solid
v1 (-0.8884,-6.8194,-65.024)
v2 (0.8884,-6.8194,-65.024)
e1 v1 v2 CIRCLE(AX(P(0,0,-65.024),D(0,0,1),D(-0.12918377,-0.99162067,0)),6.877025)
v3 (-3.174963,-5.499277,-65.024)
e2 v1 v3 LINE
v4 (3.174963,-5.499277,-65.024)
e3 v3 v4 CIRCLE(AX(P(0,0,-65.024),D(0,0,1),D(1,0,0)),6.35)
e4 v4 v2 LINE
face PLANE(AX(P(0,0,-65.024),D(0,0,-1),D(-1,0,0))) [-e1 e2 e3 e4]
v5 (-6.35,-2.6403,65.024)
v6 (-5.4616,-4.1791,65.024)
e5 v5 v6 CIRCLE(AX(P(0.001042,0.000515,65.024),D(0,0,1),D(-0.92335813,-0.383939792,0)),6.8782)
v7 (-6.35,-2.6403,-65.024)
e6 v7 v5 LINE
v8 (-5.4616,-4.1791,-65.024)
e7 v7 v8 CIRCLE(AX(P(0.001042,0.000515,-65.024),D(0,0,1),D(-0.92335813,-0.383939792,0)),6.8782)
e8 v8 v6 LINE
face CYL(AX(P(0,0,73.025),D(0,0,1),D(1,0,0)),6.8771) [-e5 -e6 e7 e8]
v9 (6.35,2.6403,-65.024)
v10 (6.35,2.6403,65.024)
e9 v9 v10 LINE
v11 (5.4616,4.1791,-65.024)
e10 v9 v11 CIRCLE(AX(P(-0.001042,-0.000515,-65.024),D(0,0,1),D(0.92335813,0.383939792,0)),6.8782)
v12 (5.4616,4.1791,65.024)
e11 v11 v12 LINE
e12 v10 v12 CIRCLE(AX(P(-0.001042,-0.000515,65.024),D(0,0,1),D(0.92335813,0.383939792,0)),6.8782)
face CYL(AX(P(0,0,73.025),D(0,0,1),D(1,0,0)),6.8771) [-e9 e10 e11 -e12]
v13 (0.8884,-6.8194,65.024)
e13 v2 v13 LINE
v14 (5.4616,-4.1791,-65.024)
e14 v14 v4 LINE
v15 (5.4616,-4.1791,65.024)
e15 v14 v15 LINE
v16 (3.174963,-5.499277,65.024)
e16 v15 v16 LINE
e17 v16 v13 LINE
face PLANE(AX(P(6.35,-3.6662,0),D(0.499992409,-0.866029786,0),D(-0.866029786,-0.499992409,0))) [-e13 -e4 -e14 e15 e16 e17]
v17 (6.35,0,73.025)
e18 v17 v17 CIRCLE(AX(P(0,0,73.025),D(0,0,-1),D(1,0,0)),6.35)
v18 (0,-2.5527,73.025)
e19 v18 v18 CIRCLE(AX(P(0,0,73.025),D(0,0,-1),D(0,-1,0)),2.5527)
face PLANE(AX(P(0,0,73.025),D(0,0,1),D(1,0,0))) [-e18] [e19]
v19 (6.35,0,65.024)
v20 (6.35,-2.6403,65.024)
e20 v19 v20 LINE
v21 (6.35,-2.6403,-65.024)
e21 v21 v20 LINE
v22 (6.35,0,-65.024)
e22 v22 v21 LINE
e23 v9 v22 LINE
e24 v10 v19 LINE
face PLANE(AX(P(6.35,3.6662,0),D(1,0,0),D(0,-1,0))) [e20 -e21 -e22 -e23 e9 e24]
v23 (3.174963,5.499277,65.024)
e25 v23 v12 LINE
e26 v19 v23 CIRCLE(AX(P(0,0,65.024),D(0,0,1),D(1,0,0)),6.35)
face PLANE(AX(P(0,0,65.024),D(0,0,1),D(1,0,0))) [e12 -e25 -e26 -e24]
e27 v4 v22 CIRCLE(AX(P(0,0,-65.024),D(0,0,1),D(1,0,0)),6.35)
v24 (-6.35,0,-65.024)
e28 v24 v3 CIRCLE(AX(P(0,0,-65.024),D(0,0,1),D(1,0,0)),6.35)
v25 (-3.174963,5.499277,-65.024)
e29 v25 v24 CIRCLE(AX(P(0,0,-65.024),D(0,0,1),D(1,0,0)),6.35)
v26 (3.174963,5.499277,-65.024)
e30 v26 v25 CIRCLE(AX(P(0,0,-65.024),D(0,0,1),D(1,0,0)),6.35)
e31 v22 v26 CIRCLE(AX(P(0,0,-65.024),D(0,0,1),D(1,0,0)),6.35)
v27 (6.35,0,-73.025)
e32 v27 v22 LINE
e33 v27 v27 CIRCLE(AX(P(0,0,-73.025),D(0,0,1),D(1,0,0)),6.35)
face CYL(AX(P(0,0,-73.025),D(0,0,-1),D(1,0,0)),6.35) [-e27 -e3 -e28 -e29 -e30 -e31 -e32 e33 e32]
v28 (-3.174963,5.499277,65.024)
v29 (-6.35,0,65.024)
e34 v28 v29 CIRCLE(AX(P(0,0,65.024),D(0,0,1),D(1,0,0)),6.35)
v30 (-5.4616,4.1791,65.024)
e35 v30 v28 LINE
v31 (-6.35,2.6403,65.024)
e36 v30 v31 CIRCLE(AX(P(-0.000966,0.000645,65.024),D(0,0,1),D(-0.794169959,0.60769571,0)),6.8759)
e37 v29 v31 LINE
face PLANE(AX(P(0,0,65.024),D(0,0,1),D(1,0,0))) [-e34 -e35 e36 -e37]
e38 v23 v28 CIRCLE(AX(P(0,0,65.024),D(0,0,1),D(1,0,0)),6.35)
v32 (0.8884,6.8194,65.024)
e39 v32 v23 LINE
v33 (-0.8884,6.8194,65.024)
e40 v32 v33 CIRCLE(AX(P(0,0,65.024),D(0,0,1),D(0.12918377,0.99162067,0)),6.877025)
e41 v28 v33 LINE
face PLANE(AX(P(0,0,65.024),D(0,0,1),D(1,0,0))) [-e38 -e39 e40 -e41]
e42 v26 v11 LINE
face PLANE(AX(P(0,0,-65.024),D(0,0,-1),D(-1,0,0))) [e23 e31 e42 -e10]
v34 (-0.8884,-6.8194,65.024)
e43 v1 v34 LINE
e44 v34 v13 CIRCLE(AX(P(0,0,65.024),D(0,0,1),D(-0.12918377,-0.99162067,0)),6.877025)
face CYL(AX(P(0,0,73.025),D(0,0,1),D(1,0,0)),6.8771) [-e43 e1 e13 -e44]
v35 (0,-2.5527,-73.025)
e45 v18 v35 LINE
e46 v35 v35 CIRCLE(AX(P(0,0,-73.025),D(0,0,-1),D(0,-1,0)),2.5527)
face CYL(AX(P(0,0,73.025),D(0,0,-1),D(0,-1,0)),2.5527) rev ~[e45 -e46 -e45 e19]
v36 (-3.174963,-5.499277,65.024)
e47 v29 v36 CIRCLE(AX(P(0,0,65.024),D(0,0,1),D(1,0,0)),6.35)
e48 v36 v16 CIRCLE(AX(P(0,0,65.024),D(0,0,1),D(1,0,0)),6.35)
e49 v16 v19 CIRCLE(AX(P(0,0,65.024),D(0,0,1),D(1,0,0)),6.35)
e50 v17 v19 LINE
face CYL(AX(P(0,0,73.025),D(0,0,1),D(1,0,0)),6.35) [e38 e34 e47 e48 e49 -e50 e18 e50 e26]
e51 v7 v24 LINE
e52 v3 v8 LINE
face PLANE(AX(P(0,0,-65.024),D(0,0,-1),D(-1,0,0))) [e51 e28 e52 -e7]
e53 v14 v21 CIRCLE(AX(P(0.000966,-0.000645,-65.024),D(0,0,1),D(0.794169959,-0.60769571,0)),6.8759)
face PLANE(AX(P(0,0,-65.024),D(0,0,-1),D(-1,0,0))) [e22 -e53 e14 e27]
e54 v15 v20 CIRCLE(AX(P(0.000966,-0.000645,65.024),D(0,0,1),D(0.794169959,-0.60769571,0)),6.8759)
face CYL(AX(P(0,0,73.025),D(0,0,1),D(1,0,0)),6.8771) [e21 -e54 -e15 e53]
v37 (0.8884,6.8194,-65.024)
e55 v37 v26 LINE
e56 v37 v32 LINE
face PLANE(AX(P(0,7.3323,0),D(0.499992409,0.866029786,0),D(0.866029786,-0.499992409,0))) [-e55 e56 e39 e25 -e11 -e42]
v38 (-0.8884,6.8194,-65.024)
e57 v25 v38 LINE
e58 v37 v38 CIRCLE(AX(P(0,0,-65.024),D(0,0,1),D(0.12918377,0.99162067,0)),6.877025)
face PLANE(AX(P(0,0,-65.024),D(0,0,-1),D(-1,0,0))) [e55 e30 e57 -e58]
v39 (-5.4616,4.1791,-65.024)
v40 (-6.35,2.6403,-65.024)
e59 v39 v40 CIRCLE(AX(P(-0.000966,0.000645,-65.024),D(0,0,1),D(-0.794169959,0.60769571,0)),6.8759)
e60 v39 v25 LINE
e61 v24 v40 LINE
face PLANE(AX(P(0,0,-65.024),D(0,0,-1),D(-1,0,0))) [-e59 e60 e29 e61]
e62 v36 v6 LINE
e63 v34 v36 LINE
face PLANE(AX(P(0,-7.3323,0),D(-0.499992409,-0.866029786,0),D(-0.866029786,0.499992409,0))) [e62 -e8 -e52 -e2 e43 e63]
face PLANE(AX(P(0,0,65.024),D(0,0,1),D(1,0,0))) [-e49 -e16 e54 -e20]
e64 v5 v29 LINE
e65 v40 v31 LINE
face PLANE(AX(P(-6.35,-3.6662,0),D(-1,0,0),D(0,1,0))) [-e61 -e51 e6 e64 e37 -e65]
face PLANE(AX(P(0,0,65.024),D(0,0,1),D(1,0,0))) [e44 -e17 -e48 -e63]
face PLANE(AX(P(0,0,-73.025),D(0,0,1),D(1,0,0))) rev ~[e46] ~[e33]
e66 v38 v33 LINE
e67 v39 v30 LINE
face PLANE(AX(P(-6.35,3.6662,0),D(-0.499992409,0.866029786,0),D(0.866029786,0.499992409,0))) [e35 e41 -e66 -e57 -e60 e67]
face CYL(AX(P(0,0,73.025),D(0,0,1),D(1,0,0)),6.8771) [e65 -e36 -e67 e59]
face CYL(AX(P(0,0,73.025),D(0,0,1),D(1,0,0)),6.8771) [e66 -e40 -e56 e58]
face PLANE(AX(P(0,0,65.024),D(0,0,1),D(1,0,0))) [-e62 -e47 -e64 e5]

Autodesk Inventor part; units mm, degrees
ref_plane "YZ Plane" through (0, 0, 0) normal (1, 0, 0) x (0, 1, 0)
ref_plane "XZ Plane" through (0, 0, 0) normal (0, 1, 0) x (-1, 0, 0)
ref_plane "XY Plane" through (0, 0, 0) normal (0, 0, 1) x (1, 0, 0)
sketch "Sketch1" plane through (0, 0, 0) normal (0, 0, 1) x (1, 0, 0)
  line L0 (-6.35, -3.6662) -> (-6.35, 3.6662)
  line L1 (-6.35, 3.6662) -> (0, 7.3323)
  line L2 (0, 7.3323) -> (6.35, 3.6662)
  line L3 (6.35, 3.6662) -> (6.35, -3.6662)
  line L4 (6.35, -3.6662) -> (0, -7.3323)
  line L5 (0, -7.3323) -> (-6.35, -3.6662)
  point P0 (0, 0)
  point P1 (0, 0)
  dimension "Size" = 12.7
extrude "Extrusion1" add sketch "Sketch1" along normal mid plane 146.05
sketch "Sketch3" plane through (0, 0, 73.025) normal (0, 0, 1) x (1, 0, 0)
  line L0 (-6.35, 3.6662) -> (0, 7.3323) construction
  line L1 (0, 7.3323) -> (6.35, 3.6662) construction
  line L2 (6.35, 3.6662) -> (6.35, -3.6662) construction
  line L3 (6.35, -3.6662) -> (0, -7.3323) construction
  line L4 (0, -7.3323) -> (-6.35, -3.6662) construction
  line L5 (-6.35, -3.6662) -> (-6.35, 3.6662) construction
  point P0 (0, 0)
hole "Hole1" at (0, 0, 73.025) direction (0, 0, -1) diameter 5.1054 end through all
sketch "Sketch4" plane through (0, 0, 73.025) normal (0, 0, 1) x (1, 0, 0)
  circle A0 centre (0, 0) radius 2.5527 construction
  line L0 (-6.35, 3.6662) -> (0, 7.3323) construction
  line L1 (0, 7.3323) -> (6.35, 3.6662) construction
  line L2 (6.35, 3.6662) -> (6.35, -3.6662) construction
  line L3 (6.35, -3.6662) -> (0, -7.3323) construction
  line L4 (0, -7.3323) -> (-6.35, -3.6662) construction
  line L5 (-6.35, -3.6662) -> (-6.35, 3.6662) construction
  circle A1 centre (0, 0) radius 6.8771
  circle A2 centre (0, 0) radius 8.89
  dimension "thunder" = 13.7541
  dimension "d16" = 17.78
extrude "Extrusion3" cut sketch "Sketch4" against normal through all
sketch "Sketch5" plane through (0, 0, 73.025) normal (0, 0, 1) x (1, 0, 0)
  arc A0 (5.4616, -4.1791) -> (6.35, -2.6403) centre (0, 0) ccw projected
  line L0 (5.4616, -4.1791) -> (0.8884, -6.8194) projected
  arc A1 (-0.8884, -6.8194) -> (0.8884, -6.8194) centre (0, 0) ccw projected
  line L1 (-0.8884, -6.8194) -> (-5.4616, -4.1791) projected
  arc A2 (-6.35, -2.6403) -> (-5.4616, -4.1791) centre (0, 0) ccw projected
  line L2 (-6.35, -2.6403) -> (-6.35, 2.6403) projected
  arc A3 (-5.4616, 4.1791) -> (-6.35, 2.6403) centre (0, 0) ccw projected
  line L3 (-5.4616, 4.1791) -> (-0.8884, 6.8194) projected
  arc A4 (0.8884, 6.8194) -> (-0.8884, 6.8194) centre (0, 0) ccw projected
  line L4 (0.8884, 6.8194) -> (5.4616, 4.1791) projected
  arc A5 (6.35, 2.6403) -> (5.4616, 4.1791) centre (0, 0) ccw projected
  line L5 (6.35, 2.6403) -> (6.35, -2.6403) projected
  circle A6 centre (0, 0) radius 2.5527 projected
  circle A7 centre (0, 0) radius 6.35
  point P0 (-3.175, 5.4993)
  point P1 (3.175, 5.4993)
  point P2 (6.35, 0)
  point P3 (-6.35, 0)
  point P4 (-3.175, -5.4993)
  point P5 (3.175, -5.4993)
  dimension "d19" = 12.7
extrude "Extrusion4" cut sketch "Sketch5" against normal blind 8.001 contours L0 A7 L5 A0 | L0 A1 L1 A7 | A7 L4 A5 L5 | L1 A2 L2 A7 | A7 L3 A4 L4 | L2 A3 L3 A7
mirror "Mirror2" about plane through (0, 0, 0) normal (0, 0, 1) of "Extrusion4"
equation "\"bearing\" = 25.4"
properties part number "CL4-019" material "Aluminum 6061"
